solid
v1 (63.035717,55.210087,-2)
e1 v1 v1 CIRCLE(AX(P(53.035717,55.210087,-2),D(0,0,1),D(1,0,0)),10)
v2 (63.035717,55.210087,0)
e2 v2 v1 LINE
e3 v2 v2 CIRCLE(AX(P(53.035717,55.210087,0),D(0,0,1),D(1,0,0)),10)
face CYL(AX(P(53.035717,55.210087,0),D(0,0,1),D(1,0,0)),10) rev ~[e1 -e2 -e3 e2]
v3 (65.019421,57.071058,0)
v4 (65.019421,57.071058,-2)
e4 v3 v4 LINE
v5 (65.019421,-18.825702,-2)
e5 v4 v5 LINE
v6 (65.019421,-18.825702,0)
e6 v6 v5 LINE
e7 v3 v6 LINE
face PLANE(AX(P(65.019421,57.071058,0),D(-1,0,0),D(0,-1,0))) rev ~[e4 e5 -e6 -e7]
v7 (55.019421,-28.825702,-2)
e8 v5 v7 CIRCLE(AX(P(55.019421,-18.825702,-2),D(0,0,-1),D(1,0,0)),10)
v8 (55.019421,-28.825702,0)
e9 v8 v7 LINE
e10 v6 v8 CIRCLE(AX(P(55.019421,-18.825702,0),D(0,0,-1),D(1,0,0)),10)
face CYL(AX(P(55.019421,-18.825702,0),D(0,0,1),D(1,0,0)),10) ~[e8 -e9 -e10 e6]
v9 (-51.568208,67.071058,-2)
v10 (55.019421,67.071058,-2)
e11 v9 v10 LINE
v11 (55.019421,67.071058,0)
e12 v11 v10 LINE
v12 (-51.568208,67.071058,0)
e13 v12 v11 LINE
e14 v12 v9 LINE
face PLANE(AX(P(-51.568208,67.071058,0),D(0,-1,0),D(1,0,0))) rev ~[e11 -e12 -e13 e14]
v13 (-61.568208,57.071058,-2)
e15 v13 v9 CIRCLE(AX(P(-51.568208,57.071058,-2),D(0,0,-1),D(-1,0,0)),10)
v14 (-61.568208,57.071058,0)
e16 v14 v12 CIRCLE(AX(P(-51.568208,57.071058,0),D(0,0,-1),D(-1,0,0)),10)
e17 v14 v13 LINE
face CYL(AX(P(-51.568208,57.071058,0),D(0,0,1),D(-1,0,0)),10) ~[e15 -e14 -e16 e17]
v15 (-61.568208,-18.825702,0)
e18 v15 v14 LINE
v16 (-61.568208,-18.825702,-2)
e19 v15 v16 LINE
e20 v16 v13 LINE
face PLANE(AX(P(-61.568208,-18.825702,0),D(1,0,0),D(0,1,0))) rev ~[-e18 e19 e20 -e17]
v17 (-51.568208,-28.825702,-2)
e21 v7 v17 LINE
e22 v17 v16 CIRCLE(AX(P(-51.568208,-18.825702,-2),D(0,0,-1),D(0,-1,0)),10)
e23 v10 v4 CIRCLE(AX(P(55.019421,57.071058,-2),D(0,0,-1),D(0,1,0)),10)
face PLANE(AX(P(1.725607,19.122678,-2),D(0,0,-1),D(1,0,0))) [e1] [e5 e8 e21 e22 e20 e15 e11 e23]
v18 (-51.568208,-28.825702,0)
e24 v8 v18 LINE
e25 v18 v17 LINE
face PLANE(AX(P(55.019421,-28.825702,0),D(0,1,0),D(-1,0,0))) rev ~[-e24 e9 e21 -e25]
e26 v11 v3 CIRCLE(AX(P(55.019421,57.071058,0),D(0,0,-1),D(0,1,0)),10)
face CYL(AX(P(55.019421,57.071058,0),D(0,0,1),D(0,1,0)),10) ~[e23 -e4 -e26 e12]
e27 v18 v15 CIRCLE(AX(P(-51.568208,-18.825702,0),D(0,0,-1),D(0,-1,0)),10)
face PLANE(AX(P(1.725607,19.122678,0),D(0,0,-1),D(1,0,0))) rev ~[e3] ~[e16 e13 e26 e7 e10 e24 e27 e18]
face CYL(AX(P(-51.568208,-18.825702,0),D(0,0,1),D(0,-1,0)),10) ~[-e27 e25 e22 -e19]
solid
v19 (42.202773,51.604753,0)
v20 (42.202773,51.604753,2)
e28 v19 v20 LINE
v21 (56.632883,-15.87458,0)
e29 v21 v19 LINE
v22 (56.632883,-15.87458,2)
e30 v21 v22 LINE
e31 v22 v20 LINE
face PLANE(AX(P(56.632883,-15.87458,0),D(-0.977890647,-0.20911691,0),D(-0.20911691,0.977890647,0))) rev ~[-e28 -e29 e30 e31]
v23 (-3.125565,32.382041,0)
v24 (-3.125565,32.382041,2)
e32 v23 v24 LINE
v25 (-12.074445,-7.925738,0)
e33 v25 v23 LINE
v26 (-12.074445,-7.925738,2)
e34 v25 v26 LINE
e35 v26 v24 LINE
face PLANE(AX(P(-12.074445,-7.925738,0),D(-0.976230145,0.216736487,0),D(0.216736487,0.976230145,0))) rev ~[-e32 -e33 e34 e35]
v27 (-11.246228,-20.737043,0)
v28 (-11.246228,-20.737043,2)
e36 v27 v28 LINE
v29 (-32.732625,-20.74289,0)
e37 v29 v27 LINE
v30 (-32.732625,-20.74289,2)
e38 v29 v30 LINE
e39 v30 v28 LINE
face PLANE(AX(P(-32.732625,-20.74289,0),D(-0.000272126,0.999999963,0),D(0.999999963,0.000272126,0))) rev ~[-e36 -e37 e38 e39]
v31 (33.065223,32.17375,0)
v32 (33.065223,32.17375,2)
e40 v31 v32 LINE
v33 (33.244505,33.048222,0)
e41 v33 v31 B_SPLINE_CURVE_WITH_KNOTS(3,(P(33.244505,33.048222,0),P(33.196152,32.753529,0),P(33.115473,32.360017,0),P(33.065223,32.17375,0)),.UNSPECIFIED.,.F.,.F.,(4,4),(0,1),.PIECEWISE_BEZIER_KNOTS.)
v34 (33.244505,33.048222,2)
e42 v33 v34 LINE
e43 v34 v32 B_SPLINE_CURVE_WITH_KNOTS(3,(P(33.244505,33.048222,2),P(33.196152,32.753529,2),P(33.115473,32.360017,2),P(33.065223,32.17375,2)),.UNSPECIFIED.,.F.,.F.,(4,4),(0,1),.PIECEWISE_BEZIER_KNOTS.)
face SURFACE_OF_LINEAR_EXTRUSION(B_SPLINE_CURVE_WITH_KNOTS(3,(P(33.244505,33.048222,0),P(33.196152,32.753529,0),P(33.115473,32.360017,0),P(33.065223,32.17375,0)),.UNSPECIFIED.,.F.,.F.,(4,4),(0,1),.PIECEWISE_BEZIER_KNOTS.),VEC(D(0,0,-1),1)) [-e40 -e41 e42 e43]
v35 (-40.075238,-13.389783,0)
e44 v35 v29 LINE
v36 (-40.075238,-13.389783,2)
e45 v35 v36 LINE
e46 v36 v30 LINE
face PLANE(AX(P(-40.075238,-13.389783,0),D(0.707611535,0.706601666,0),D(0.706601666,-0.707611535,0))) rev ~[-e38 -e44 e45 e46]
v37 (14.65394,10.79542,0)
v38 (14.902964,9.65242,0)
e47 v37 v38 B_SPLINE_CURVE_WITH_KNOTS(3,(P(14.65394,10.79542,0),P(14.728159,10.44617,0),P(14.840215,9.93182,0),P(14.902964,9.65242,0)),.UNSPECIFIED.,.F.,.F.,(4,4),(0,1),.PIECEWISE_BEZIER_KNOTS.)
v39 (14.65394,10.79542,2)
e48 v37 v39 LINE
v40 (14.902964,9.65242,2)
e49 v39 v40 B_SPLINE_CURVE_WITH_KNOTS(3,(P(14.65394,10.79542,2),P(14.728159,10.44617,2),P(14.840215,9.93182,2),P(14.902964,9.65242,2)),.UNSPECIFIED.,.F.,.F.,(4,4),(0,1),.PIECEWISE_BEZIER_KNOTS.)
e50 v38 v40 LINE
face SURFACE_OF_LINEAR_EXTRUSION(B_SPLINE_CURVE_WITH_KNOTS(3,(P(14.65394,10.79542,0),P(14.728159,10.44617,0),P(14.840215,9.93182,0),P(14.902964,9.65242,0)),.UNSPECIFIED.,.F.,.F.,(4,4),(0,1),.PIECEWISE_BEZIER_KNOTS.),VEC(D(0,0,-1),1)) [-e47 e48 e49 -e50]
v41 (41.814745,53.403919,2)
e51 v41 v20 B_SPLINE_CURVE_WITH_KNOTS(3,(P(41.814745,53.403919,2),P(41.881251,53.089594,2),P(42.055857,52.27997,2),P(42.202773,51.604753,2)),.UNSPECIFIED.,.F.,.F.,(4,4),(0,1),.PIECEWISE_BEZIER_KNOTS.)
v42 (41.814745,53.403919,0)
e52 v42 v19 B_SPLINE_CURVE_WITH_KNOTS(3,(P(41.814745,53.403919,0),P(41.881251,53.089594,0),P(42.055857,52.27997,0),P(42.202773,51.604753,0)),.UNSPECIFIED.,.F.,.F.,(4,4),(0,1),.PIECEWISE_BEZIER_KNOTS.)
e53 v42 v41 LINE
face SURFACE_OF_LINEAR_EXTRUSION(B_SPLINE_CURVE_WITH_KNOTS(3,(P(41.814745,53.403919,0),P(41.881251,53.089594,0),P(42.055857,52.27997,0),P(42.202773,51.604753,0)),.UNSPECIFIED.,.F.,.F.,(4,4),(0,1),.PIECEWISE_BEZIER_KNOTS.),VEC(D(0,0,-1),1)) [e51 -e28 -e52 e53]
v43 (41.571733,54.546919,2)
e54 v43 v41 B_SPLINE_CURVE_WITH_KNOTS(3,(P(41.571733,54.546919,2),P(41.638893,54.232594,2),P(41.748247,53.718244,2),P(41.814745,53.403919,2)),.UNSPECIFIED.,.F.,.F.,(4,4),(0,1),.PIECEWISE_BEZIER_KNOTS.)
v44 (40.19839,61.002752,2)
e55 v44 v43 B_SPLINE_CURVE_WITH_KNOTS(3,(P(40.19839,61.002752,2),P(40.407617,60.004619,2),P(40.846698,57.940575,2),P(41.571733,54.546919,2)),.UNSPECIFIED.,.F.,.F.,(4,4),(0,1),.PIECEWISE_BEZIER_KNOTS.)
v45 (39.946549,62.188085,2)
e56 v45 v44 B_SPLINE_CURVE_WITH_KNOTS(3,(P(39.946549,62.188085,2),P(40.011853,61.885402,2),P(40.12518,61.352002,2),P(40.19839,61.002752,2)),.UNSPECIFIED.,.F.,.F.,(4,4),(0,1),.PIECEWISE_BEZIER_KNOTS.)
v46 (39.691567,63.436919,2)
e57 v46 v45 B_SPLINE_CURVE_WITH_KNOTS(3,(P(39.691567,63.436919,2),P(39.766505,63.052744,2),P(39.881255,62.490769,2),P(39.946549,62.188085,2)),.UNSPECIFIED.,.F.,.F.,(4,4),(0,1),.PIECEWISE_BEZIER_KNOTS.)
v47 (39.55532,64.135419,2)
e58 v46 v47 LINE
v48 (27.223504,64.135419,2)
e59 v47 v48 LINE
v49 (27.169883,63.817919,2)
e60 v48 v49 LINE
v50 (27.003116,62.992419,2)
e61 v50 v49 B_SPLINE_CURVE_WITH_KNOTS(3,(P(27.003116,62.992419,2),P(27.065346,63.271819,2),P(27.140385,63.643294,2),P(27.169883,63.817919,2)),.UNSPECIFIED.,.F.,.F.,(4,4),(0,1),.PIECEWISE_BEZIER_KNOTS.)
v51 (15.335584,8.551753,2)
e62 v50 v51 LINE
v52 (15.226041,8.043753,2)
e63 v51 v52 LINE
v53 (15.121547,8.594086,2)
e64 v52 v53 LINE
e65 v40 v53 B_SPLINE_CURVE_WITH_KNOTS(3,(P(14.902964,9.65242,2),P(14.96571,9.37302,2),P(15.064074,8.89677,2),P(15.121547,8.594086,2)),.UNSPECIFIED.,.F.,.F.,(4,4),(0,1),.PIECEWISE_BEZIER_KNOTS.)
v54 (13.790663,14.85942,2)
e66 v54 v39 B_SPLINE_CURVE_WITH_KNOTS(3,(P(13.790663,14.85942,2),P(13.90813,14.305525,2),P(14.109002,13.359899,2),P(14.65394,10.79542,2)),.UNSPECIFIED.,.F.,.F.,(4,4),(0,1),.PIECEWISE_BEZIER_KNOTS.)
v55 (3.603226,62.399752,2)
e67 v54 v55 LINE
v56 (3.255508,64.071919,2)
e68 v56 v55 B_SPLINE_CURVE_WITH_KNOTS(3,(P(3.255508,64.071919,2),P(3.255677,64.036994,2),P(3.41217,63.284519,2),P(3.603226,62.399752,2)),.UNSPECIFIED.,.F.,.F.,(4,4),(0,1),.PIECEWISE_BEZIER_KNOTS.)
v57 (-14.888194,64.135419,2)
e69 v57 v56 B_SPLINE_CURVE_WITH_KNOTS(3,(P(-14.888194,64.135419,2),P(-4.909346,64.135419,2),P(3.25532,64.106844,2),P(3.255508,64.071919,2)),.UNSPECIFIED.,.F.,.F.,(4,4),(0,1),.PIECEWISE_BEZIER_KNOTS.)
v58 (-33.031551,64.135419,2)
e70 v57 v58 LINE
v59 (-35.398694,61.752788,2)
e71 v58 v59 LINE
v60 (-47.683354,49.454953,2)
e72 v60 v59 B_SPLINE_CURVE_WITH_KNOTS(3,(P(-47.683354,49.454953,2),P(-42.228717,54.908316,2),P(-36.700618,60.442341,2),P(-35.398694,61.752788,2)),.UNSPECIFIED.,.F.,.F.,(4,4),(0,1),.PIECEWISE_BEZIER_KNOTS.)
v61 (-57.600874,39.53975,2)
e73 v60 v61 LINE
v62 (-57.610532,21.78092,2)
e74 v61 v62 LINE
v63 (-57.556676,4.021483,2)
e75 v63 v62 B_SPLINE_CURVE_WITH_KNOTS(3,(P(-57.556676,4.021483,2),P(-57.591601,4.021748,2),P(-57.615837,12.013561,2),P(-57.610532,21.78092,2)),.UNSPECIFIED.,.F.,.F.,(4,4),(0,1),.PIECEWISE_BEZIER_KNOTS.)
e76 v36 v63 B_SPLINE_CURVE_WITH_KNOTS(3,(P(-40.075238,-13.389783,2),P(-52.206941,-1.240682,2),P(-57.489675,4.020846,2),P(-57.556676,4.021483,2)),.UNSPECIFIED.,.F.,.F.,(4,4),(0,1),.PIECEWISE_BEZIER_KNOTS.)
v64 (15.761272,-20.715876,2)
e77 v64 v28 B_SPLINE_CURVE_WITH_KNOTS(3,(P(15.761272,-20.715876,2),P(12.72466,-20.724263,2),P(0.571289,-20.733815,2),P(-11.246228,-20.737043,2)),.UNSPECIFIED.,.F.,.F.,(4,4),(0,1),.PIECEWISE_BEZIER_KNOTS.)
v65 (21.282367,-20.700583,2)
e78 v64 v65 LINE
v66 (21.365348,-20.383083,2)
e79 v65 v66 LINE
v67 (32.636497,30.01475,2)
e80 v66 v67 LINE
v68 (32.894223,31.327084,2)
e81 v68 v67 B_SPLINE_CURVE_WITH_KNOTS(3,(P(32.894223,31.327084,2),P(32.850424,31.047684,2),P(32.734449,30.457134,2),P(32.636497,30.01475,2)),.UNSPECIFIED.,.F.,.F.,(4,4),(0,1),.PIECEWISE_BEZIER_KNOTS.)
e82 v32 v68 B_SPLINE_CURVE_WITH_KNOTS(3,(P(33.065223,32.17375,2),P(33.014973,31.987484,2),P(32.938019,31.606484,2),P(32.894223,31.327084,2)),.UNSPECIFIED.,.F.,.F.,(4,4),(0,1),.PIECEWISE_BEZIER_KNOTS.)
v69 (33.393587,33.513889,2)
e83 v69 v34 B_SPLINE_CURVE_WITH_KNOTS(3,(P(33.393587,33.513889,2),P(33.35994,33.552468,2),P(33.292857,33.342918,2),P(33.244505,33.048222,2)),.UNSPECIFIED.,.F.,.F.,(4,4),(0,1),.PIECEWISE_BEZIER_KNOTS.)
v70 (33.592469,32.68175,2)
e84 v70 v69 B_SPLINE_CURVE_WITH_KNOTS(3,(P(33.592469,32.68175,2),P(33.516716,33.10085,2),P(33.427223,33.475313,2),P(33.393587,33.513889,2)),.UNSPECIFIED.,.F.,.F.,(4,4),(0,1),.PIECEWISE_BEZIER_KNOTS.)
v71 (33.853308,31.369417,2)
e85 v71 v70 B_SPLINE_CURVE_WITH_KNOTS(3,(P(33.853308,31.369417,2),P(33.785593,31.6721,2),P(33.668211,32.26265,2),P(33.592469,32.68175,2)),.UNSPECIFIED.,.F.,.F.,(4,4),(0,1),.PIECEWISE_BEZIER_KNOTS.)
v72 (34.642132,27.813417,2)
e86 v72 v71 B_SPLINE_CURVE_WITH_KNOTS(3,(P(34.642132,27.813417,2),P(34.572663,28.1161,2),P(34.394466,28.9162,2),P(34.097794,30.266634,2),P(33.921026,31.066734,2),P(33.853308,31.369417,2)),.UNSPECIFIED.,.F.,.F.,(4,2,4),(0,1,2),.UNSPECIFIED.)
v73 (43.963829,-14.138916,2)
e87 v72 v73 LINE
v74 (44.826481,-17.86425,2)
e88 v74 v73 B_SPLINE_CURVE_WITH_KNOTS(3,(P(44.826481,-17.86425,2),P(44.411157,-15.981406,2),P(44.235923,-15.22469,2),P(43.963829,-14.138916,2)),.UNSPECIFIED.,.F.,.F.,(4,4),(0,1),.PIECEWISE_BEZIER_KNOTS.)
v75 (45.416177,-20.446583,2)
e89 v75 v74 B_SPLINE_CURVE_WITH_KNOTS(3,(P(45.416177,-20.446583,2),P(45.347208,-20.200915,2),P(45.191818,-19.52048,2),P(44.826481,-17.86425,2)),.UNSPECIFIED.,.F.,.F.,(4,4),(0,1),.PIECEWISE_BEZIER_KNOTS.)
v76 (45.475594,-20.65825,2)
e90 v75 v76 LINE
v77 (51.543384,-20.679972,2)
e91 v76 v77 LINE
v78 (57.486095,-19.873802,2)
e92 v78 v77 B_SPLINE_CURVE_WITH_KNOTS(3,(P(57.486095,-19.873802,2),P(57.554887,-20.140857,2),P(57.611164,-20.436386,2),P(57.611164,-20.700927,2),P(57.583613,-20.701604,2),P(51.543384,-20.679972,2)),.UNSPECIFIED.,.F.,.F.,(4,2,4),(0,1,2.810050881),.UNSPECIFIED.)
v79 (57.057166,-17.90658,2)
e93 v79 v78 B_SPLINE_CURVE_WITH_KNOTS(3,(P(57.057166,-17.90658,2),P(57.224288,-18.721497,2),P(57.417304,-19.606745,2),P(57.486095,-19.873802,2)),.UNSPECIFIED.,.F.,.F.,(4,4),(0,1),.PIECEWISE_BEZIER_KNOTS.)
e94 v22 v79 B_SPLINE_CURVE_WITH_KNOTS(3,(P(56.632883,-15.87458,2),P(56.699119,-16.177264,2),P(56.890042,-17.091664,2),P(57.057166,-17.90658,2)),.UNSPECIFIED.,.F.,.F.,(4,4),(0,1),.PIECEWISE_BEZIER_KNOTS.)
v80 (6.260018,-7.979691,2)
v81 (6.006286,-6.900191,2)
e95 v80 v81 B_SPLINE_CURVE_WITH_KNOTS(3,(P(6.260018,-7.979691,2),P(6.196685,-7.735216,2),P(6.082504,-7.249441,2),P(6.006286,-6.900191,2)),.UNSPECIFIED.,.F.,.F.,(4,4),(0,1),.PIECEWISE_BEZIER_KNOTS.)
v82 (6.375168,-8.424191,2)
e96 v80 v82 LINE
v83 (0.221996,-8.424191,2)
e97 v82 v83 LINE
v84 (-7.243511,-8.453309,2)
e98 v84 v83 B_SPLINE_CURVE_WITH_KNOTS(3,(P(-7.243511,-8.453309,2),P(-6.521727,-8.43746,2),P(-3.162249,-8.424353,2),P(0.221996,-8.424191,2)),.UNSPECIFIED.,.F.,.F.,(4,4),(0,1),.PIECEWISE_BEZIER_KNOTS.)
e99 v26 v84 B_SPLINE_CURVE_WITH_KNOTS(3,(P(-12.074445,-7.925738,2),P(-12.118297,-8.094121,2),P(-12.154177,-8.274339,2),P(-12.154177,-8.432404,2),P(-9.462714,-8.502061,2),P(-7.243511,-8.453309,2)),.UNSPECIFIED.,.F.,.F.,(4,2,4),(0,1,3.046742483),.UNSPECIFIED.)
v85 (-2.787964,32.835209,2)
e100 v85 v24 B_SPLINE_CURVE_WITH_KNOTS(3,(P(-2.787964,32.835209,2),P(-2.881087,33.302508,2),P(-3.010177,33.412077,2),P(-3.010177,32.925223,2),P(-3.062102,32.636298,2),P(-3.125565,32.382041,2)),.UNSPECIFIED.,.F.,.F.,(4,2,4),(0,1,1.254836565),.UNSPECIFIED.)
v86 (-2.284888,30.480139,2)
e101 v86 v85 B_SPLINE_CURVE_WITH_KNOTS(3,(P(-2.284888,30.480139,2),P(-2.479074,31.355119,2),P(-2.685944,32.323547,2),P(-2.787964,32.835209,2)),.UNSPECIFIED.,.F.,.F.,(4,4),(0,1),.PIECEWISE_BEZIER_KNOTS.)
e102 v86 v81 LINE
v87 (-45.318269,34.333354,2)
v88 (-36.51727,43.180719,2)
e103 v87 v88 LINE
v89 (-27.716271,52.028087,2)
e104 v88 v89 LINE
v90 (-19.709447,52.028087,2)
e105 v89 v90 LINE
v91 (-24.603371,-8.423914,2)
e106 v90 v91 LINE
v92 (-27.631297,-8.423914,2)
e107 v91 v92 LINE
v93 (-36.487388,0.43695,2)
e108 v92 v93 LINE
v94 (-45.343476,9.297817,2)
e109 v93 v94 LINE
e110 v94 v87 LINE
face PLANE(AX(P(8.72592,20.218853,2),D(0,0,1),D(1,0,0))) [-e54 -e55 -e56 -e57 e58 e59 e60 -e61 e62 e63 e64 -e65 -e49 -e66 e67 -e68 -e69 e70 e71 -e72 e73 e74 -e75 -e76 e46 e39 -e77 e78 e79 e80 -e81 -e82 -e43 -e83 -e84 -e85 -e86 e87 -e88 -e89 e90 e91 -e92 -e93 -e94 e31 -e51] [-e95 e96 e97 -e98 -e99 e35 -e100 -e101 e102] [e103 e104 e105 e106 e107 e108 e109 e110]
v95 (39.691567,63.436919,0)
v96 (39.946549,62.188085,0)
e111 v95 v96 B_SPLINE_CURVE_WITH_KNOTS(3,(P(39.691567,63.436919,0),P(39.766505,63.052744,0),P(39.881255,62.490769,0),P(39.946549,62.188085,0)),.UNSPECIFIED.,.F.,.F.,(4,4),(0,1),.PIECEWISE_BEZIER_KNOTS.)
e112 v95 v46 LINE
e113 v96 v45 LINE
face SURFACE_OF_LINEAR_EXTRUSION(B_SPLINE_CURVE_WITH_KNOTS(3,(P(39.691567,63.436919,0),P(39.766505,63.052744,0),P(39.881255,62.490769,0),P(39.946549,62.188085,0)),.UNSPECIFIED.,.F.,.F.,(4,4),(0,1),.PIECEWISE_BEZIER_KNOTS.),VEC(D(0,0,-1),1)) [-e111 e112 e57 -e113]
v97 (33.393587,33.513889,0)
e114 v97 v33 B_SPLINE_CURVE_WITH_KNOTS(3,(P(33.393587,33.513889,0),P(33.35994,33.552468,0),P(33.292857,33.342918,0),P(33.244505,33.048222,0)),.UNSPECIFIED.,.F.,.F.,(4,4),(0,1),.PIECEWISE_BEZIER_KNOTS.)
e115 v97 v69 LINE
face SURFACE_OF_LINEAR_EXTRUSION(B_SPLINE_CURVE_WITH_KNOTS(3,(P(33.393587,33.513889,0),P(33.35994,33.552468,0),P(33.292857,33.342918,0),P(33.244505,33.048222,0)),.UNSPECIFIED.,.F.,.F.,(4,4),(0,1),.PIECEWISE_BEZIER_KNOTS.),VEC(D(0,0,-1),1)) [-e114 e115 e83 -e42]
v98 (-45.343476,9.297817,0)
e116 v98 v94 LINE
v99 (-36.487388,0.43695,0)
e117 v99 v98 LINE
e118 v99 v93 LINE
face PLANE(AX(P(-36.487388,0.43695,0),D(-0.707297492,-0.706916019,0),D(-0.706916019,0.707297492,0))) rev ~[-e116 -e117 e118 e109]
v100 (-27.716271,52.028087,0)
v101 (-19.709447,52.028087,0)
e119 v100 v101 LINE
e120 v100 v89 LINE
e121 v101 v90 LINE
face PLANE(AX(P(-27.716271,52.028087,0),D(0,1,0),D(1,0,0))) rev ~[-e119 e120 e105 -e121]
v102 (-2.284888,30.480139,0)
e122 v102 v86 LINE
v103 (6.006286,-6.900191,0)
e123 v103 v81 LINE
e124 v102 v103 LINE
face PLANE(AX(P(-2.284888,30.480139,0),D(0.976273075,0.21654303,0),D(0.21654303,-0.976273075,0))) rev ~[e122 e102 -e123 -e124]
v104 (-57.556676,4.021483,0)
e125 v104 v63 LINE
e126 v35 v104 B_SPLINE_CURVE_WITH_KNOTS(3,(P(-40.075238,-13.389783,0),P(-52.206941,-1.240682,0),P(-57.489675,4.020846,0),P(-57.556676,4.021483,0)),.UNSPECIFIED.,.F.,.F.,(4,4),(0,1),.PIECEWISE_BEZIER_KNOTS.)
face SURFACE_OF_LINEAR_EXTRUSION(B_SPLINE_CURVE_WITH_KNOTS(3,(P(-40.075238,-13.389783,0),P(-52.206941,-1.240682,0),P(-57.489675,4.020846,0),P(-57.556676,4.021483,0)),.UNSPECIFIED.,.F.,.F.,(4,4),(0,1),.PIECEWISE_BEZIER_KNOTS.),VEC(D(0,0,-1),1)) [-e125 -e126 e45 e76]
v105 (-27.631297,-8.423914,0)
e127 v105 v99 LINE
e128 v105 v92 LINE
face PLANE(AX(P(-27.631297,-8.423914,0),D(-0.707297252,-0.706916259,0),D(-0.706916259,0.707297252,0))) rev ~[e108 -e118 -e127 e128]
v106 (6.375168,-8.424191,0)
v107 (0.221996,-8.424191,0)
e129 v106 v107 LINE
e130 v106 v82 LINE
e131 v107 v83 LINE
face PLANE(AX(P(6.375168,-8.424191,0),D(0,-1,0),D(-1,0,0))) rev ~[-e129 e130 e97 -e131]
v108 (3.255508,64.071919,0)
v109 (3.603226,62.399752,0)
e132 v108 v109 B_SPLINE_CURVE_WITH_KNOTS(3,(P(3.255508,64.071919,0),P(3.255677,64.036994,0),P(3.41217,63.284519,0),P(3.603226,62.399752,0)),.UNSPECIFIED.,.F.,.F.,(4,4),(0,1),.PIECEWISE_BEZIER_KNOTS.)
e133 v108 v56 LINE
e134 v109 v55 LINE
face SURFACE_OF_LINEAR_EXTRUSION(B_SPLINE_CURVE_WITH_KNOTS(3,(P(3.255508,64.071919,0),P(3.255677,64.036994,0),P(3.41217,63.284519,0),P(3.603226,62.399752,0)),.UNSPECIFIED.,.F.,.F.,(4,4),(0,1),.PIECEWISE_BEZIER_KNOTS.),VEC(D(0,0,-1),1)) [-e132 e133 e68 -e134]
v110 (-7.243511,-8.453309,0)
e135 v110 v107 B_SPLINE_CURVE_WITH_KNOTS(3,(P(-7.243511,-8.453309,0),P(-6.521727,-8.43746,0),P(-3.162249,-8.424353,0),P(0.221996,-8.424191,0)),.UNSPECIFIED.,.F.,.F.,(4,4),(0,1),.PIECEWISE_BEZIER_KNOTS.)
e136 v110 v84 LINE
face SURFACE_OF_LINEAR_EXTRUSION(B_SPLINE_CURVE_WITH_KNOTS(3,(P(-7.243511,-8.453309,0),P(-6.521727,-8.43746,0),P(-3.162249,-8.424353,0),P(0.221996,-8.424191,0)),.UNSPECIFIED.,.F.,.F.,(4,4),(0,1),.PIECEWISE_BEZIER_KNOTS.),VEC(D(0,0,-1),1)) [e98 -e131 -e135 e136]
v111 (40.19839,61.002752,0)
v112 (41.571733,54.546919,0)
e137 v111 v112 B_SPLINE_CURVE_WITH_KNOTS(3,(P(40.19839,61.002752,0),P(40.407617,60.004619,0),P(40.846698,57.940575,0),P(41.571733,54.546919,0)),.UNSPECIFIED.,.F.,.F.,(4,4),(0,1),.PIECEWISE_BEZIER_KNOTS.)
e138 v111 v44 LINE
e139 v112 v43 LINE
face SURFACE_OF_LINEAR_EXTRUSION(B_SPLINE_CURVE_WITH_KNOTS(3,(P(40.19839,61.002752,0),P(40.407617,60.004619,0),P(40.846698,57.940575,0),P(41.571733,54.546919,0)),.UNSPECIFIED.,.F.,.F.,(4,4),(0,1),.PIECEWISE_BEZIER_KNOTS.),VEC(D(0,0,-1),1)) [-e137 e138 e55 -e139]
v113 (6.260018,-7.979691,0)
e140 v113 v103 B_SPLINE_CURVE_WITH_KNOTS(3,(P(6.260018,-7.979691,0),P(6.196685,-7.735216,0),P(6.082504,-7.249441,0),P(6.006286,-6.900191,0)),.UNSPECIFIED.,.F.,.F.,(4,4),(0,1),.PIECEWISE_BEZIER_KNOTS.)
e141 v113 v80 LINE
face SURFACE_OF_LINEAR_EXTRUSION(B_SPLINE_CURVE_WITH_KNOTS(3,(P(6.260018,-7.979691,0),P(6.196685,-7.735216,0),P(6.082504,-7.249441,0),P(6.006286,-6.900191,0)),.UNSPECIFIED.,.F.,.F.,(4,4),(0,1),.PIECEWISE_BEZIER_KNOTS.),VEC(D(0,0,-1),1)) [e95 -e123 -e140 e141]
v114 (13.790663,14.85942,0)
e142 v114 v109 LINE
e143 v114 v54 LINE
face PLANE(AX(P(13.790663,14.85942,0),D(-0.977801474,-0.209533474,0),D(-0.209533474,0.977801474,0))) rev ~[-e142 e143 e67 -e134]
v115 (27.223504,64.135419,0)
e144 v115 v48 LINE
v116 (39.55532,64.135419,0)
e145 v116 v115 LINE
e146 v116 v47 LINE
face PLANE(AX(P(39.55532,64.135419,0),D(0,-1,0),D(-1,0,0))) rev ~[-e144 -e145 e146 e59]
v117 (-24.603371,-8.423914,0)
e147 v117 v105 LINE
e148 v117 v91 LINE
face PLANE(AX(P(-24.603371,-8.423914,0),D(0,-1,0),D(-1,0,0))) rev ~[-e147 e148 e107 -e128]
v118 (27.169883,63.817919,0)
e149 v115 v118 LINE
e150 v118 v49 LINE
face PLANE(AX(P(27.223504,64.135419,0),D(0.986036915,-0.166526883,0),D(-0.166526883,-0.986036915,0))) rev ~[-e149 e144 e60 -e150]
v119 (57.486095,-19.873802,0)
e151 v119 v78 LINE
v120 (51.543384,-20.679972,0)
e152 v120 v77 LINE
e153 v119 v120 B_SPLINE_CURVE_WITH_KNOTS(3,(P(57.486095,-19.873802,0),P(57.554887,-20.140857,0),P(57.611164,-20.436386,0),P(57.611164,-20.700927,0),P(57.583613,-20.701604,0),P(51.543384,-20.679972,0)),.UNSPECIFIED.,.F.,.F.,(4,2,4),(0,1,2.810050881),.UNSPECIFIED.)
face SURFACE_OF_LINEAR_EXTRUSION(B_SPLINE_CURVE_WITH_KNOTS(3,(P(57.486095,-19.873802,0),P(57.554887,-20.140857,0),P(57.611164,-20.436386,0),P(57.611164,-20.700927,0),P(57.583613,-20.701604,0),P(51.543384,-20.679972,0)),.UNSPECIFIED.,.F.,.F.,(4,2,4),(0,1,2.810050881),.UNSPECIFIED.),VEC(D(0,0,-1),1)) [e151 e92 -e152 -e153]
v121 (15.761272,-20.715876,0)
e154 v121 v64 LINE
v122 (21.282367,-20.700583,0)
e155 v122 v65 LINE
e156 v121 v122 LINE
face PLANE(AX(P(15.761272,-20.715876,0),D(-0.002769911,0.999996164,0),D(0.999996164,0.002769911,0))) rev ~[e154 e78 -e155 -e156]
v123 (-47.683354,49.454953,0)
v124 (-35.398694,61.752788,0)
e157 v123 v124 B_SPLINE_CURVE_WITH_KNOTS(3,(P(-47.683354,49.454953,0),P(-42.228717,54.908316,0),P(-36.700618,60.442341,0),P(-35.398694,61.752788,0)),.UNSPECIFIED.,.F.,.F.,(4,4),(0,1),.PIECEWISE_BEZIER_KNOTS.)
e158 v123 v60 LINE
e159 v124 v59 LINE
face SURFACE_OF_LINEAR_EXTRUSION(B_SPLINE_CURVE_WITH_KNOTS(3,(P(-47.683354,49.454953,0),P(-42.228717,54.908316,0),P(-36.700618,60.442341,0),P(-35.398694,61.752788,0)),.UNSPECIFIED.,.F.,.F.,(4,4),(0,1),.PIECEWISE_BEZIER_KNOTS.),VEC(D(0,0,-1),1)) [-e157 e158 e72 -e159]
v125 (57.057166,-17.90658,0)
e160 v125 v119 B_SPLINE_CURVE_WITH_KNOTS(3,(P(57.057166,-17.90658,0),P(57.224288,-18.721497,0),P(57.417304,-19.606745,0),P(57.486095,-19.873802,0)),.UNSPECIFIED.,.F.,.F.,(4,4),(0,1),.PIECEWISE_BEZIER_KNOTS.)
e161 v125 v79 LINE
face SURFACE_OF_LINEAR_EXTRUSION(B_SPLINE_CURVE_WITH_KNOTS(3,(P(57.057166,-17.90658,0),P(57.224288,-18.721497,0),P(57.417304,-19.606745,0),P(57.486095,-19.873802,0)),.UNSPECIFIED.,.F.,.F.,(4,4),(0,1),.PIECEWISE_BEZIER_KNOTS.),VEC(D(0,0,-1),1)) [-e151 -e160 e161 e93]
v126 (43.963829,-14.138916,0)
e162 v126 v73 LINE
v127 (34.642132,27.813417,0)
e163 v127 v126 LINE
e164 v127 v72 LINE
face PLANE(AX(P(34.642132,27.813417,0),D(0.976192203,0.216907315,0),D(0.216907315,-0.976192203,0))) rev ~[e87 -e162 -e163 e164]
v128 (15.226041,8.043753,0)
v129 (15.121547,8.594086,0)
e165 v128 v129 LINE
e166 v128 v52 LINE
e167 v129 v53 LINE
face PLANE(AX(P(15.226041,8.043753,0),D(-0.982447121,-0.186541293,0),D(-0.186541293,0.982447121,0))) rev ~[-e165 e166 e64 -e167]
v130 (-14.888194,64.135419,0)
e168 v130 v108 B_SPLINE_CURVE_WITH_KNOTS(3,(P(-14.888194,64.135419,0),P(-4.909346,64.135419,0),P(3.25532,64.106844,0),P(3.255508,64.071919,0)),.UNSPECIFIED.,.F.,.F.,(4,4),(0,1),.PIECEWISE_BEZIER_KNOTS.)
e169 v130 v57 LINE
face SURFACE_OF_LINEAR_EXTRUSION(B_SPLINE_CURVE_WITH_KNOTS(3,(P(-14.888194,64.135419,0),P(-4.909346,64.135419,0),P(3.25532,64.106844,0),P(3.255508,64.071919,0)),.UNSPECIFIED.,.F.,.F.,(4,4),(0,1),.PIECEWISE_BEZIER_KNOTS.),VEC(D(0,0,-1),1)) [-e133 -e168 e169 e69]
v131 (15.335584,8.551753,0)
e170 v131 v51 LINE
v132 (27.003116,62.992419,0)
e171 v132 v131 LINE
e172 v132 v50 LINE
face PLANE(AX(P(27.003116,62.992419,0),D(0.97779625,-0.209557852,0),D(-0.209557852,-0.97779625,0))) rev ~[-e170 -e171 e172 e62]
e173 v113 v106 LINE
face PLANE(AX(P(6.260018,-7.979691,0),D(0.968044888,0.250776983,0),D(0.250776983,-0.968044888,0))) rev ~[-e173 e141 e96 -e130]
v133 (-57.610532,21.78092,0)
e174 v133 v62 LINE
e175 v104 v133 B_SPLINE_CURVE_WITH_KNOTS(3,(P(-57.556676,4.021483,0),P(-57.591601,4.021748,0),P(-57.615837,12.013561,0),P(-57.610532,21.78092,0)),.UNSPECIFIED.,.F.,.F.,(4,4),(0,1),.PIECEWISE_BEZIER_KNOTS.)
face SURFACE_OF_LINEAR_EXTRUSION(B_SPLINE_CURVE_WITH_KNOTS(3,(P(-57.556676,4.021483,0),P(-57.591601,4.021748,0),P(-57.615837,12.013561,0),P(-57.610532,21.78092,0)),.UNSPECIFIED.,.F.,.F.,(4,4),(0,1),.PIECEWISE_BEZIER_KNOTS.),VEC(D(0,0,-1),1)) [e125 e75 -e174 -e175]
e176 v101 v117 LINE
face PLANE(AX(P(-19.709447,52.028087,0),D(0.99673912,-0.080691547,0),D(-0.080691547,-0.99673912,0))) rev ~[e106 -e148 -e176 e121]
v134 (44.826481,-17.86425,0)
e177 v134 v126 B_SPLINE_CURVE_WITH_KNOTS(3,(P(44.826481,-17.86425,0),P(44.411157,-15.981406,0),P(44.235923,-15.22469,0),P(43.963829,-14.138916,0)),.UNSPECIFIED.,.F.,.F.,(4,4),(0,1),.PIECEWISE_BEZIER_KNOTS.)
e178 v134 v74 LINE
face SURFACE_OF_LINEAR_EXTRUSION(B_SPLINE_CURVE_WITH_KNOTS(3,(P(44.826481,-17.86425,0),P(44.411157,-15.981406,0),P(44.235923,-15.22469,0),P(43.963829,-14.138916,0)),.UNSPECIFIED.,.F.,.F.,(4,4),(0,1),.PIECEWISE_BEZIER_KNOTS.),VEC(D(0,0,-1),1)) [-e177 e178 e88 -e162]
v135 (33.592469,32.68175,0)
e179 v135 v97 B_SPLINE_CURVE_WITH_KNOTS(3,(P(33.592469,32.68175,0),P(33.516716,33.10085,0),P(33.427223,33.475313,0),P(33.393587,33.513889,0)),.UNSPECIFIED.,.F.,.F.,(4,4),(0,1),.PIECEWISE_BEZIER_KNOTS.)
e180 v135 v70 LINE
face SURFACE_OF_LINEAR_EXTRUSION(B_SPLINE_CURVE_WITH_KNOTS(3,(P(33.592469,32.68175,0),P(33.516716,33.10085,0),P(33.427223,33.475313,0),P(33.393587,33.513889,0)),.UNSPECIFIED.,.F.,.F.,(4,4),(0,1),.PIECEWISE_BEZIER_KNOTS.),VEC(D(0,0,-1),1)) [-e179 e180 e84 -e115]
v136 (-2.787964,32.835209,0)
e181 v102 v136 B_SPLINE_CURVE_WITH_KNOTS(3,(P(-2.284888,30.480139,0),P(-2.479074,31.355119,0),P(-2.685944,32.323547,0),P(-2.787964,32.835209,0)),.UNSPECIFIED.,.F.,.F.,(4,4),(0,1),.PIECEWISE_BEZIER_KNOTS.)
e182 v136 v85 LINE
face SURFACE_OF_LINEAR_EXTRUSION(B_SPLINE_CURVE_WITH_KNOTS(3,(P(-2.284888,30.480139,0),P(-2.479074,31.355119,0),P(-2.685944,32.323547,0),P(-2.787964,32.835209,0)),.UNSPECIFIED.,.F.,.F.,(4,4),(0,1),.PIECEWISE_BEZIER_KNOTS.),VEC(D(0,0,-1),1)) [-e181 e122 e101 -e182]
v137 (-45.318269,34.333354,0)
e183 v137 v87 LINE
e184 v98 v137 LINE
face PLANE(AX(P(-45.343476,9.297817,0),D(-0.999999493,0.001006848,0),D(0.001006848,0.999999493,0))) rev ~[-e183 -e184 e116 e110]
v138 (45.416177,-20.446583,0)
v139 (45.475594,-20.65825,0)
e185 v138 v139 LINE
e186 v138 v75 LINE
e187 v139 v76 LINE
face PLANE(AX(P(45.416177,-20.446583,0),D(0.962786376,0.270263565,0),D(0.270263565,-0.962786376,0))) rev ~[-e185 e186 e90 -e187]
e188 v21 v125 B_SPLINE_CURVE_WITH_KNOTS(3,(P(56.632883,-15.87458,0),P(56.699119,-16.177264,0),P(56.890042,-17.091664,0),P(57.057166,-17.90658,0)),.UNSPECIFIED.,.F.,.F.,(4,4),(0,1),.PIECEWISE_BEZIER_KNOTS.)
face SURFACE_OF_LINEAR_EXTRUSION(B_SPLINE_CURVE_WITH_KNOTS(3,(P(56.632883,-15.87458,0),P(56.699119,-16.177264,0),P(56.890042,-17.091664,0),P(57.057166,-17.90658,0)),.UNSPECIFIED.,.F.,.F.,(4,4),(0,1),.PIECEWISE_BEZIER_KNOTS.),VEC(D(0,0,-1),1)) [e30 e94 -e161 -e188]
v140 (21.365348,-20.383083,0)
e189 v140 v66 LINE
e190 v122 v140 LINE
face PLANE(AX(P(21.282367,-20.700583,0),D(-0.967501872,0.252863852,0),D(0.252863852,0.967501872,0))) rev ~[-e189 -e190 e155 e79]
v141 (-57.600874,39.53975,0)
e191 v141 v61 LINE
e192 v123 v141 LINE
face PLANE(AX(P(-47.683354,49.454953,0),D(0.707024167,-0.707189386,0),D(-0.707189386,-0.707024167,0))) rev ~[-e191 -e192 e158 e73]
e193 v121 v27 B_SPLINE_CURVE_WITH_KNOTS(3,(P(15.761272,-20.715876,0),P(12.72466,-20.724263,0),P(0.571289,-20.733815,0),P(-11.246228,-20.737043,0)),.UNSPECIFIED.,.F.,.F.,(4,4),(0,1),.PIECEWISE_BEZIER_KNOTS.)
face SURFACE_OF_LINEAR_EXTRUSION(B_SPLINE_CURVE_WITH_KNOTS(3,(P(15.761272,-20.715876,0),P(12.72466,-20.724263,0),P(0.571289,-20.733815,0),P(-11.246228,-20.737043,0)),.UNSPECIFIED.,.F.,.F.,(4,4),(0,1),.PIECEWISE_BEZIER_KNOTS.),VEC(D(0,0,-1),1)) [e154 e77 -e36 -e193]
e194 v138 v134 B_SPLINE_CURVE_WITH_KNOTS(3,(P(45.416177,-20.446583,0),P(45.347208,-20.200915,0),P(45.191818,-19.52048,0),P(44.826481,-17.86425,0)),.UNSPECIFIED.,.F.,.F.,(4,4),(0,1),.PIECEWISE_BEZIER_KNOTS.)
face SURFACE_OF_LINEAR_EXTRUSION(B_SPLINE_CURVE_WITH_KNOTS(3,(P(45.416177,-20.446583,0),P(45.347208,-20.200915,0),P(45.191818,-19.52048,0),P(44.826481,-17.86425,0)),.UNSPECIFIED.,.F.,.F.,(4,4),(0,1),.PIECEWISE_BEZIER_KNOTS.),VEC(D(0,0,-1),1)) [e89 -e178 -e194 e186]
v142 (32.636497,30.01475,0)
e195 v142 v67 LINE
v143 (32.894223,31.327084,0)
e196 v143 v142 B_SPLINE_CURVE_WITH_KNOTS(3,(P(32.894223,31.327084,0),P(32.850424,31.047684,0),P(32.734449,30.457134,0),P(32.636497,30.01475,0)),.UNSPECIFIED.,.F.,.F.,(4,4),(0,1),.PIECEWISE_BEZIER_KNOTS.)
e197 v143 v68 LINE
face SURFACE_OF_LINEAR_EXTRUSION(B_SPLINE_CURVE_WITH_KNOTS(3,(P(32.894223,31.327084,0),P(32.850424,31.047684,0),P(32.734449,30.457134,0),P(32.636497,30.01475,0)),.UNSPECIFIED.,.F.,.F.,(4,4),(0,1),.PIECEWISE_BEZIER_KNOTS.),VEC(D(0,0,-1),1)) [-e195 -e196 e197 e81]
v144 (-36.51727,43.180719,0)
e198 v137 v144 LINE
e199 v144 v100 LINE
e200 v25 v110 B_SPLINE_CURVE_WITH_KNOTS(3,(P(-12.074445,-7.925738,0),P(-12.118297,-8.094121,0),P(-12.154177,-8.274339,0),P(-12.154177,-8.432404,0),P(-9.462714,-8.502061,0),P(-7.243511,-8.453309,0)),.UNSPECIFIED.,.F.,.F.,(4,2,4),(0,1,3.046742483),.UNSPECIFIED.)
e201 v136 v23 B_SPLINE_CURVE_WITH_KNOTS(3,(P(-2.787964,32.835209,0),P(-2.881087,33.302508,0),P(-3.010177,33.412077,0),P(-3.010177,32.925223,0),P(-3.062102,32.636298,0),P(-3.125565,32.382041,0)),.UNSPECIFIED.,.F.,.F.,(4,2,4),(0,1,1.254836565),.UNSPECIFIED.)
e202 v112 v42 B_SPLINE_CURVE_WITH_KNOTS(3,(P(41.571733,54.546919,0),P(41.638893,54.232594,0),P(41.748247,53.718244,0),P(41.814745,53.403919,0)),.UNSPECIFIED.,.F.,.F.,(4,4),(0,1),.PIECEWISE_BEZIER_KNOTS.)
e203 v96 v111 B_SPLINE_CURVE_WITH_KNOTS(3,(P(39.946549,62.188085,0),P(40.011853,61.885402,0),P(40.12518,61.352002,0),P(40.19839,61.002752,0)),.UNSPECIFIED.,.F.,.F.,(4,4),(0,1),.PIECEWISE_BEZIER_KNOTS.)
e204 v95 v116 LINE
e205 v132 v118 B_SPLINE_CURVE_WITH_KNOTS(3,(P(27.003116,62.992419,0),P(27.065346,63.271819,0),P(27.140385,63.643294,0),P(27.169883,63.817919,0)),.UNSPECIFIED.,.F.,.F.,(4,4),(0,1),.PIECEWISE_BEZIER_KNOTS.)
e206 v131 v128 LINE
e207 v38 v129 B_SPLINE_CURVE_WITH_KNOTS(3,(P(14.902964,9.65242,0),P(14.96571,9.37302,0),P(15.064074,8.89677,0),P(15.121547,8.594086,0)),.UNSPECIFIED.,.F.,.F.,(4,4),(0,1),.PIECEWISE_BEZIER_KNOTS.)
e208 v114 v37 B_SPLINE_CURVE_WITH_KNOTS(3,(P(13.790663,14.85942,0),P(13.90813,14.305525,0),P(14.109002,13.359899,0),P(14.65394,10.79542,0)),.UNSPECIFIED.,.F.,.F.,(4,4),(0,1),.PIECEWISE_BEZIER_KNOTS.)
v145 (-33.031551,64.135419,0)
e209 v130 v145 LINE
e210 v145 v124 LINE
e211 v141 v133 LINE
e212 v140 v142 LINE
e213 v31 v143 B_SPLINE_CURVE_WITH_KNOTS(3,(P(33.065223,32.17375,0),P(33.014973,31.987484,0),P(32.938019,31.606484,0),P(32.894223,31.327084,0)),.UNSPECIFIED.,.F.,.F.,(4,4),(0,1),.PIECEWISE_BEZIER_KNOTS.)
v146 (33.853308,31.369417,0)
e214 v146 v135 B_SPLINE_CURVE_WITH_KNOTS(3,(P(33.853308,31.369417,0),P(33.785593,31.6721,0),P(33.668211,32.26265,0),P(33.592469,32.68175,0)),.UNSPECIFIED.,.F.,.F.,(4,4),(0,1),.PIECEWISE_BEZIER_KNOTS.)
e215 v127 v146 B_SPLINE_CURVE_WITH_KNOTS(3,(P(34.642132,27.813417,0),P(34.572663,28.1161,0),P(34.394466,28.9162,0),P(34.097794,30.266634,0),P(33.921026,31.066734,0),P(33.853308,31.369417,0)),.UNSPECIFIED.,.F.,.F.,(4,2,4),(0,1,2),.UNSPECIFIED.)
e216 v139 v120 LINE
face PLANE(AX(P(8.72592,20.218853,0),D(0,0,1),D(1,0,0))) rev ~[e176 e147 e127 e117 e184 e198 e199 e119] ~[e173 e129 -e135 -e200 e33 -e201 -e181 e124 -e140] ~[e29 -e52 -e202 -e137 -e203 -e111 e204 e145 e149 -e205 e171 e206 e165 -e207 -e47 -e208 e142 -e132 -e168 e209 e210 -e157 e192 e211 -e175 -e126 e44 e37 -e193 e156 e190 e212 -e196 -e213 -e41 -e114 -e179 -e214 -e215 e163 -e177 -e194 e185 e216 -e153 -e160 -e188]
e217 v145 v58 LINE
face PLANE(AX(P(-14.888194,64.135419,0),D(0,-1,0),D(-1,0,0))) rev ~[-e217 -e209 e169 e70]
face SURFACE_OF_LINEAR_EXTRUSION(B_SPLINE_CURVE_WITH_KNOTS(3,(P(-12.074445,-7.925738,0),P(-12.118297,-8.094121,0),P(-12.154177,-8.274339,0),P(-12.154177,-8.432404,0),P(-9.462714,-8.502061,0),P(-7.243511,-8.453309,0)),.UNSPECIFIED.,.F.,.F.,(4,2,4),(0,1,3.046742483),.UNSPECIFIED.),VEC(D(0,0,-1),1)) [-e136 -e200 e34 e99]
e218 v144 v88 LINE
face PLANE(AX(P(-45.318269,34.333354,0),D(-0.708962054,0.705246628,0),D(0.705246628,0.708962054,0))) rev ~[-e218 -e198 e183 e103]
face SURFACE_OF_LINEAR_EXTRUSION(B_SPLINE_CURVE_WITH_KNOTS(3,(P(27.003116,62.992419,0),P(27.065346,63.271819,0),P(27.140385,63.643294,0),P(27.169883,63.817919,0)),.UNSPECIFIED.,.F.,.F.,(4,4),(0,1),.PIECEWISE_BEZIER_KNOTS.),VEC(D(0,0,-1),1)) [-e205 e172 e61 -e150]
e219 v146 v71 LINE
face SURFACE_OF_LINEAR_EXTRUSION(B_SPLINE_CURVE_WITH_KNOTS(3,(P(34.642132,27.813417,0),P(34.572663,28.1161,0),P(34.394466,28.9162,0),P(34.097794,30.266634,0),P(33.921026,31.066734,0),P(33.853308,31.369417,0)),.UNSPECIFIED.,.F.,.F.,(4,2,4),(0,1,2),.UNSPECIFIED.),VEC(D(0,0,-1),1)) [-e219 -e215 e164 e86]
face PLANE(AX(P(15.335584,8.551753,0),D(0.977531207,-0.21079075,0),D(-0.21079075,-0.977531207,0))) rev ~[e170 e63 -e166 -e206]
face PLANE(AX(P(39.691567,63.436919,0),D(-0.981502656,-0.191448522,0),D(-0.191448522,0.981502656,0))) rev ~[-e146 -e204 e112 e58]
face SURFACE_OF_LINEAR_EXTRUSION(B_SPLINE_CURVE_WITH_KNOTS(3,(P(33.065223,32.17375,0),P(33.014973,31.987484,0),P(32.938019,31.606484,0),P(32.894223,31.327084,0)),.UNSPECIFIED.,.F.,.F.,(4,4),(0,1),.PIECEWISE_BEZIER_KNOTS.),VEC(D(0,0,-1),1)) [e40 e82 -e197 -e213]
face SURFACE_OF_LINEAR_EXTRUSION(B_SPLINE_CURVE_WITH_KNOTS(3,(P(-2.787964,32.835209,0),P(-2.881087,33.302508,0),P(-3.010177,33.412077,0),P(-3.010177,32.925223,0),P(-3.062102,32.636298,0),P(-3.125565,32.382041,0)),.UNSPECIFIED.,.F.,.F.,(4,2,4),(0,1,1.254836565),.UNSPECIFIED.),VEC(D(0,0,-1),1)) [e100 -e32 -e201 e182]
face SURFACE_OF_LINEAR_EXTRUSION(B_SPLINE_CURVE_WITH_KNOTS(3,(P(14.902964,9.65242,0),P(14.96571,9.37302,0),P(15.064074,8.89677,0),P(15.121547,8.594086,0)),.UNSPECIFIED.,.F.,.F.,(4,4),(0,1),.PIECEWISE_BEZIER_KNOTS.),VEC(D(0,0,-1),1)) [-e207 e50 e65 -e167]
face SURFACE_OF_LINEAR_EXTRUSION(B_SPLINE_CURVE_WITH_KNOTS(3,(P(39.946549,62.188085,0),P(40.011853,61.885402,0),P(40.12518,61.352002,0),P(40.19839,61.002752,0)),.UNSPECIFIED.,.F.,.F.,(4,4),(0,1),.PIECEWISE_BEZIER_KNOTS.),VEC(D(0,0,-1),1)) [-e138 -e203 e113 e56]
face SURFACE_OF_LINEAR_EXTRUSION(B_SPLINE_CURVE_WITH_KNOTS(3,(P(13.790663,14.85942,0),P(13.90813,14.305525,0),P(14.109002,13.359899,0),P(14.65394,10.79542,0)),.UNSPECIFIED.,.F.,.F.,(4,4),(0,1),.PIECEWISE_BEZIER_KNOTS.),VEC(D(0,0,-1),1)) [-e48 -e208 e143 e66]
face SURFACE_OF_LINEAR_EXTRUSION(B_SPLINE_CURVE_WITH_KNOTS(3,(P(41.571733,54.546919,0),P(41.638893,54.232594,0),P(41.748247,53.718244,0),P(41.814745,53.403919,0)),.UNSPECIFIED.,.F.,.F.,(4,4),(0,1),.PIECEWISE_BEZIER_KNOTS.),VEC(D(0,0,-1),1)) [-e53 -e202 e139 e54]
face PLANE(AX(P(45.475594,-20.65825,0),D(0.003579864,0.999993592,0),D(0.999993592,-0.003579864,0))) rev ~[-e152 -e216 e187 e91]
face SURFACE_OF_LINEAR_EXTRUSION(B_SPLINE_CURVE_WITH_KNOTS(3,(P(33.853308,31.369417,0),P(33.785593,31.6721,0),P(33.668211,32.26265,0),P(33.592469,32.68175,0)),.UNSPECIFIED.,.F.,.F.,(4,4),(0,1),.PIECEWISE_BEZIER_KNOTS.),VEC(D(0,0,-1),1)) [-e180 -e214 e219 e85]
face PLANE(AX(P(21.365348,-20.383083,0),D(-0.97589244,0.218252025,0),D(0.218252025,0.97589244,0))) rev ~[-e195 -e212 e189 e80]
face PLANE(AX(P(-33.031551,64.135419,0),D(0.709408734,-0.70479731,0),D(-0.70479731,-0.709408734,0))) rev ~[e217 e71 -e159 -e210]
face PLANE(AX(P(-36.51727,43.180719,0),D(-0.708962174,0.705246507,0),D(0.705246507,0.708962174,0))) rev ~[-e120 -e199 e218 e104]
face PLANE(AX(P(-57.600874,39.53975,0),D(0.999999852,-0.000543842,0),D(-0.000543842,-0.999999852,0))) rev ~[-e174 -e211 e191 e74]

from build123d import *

# Parameters (mm, degrees)
F1_DEPTH = 2
F3_DEPTH = 2
F4_R     = 10
F5_DEPTH = 2


# Not quite as in the source:
# - ends of sketch curves that miss each other by under 0.0002 mm in the source are joined


with BuildPart() as f1:
    # F0 (on Top) → F1 (new body)
    with BuildSketch(Plane.XY):
        with BuildLine():
            Line((-57.600874, 39.53975), (-57.610532, 21.78092))
            add(Edge.make_bspline(
                [(-57.556676, 4.021483), (-57.591601, 4.021748), (-57.615837, 12.013561), (-57.610532, 21.78092)],
                knots=[0, 0, 0, 0, 1, 1, 1, 1], degree=3))
            add(Edge.make_bspline(
                [(-40.075238, -13.389783), (-52.206941, -1.240682), (-57.489675, 4.020846), (-57.556676, 4.021483)],
                knots=[0, 0, 0, 0, 1, 1, 1, 1], degree=3))
            Line((-40.075238, -13.389783), (-32.732625, -20.74289))
            Line((-32.732625, -20.74289), (-11.246228, -20.737043))
            add(Edge.make_bspline(
                [(15.761272, -20.715876), (12.72466, -20.724263), (0.571289, -20.733815), (-11.246228, -20.737043)],
                knots=[0, 0, 0, 0, 1, 1, 1, 1], degree=3))
            Line((15.761272, -20.715876), (21.282367, -20.700583))
            Line((21.282367, -20.700583), (21.365348, -20.383083))
            Line((21.365348, -20.383083), (32.636497, 30.01475))
            add(Edge.make_bspline(
                [(32.894223, 31.327084), (32.850424, 31.047684), (32.734449, 30.457134), (32.636497, 30.01475)],
                knots=[0, 0, 0, 0, 1, 1, 1, 1], degree=3))
            add(Edge.make_bspline(
                [(33.065223, 32.17375), (33.014973, 31.987484), (32.938019, 31.606484), (32.894223, 31.327084)],
                knots=[0, 0, 0, 0, 1, 1, 1, 1], degree=3))
            add(Edge.make_bspline(
                [(33.244505, 33.048222), (33.196152, 32.753529), (33.115473, 32.360017), (33.065223, 32.17375)],
                knots=[0, 0, 0, 0, 1, 1, 1, 1], degree=3))
            add(Edge.make_bspline(
                [(33.393587, 33.513889), (33.35994, 33.552468), (33.292857, 33.342918), (33.244505, 33.048222)],
                knots=[0, 0, 0, 0, 1, 1, 1, 1], degree=3))
            add(Edge.make_bspline(
                [(33.592469, 32.68175), (33.516716, 33.10085), (33.427223, 33.475313), (33.393587, 33.513889)],
                knots=[0, 0, 0, 0, 1, 1, 1, 1], degree=3))
            add(Edge.make_bspline(
                [(33.853308, 31.369417), (33.785593, 31.6721), (33.668211, 32.26265), (33.592469, 32.68175)],
                knots=[0, 0, 0, 0, 1, 1, 1, 1], degree=3))
            add(Edge.make_bspline(
                [(34.24613, 29.591417), (34.097794, 30.266634), (33.921026, 31.066734), (33.853308, 31.369417)],
                knots=[0, 0, 0, 0, 1, 1, 1, 1], degree=3))
            add(Edge.make_bspline(
                [(34.642132, 27.813417), (34.572663, 28.1161), (34.394466, 28.9162), (34.24613, 29.591417)],
                knots=[0, 0, 0, 0, 1, 1, 1, 1], degree=3))
            Line((34.642132, 27.813417), (43.963829, -14.138916))
            add(Edge.make_bspline(
                [(44.826481, -17.86425), (44.411157, -15.981406), (44.235923, -15.22469), (43.963829, -14.138916)],
                knots=[0, 0, 0, 0, 1, 1, 1, 1], degree=3))
            add(Edge.make_bspline(
                [(45.416177, -20.446583), (45.347208, -20.200915), (45.191818, -19.52048), (44.826481, -17.86425)],
                knots=[0, 0, 0, 0, 1, 1, 1, 1], degree=3))
            Line((45.416177, -20.446583), (45.475594, -20.65825))
            Line((45.475594, -20.65825), (51.543384, -20.679972))
            add(Edge.make_bspline(
                [(57.611164, -20.530527), (57.611164, -20.700927), (57.583613, -20.701604), (51.543384, -20.679972)],
                knots=[0, 0, 0, 0, 1, 1, 1, 1], degree=3))
            add(Edge.make_bspline(
                [(57.486095, -19.873802), (57.554887, -20.140857), (57.611164, -20.436386), (57.611164, -20.530527)],
                knots=[0, 0, 0, 0, 1, 1, 1, 1], degree=3))
            add(Edge.make_bspline(
                [(57.057166, -17.90658), (57.224288, -18.721497), (57.417304, -19.606745), (57.486095, -19.873802)],
                knots=[0, 0, 0, 0, 1, 1, 1, 1], degree=3))
            add(Edge.make_bspline(
                [(56.632883, -15.87458), (56.699119, -16.177264), (56.890042, -17.091664), (57.057166, -17.90658)],
                knots=[0, 0, 0, 0, 1, 1, 1, 1], degree=3))
            Line((56.632883, -15.87458), (42.202773, 51.604753))
            add(Edge.make_bspline(
                [(41.814745, 53.403919), (41.881251, 53.089594), (42.055857, 52.27997), (42.202773, 51.604753)],
                knots=[0, 0, 0, 0, 1, 1, 1, 1], degree=3))
            add(Edge.make_bspline(
                [(41.571733, 54.546919), (41.638893, 54.232594), (41.748247, 53.718244), (41.814745, 53.403919)],
                knots=[0, 0, 0, 0, 1, 1, 1, 1], degree=3))
            add(Edge.make_bspline(
                [(40.19839, 61.002752), (40.407617, 60.004619), (40.846698, 57.940575), (41.571733, 54.546919)],
                knots=[0, 0, 0, 0, 1, 1, 1, 1], degree=3))
            add(Edge.make_bspline(
                [(39.946549, 62.188085), (40.011853, 61.885402), (40.12518, 61.352002), (40.19839, 61.002752)],
                knots=[0, 0, 0, 0, 1, 1, 1, 1], degree=3))
            add(Edge.make_bspline(
                [(39.691567, 63.436919), (39.766505, 63.052744), (39.881255, 62.490769), (39.946549, 62.188085)],
                knots=[0, 0, 0, 0, 1, 1, 1, 1], degree=3))
            Line((39.691567, 63.436919), (39.55532, 64.135419))
            Line((39.55532, 64.135419), (33.389412, 64.135419))
            Line((33.389412, 64.135419), (27.223504, 64.135419))
            Line((27.223504, 64.135419), (27.169883, 63.817919))
            add(Edge.make_bspline(
                [(27.003116, 62.992419), (27.065346, 63.271819), (27.140385, 63.643294), (27.169883, 63.817919)],
                knots=[0, 0, 0, 0, 1, 1, 1, 1], degree=3))
            Line((27.003116, 62.992419), (15.335584, 8.551753))
            Line((15.335584, 8.551753), (15.226041, 8.043753))
            Line((15.226041, 8.043753), (15.121547, 8.594086))
            add(Edge.make_bspline(
                [(14.902964, 9.65242), (14.96571, 9.37302), (15.064074, 8.89677), (15.121547, 8.594086)],
                knots=[0, 0, 0, 0, 1, 1, 1, 1], degree=3))
            add(Edge.make_bspline(
                [(14.65394, 10.79542), (14.728159, 10.44617), (14.840215, 9.93182), (14.902964, 9.65242)],
                knots=[0, 0, 0, 0, 1, 1, 1, 1], degree=3))
            add(Edge.make_bspline(
                [(13.790663, 14.85942), (13.90813, 14.305525), (14.109002, 13.359899), (14.65394, 10.79542)],
                knots=[0, 0, 0, 0, 1, 1, 1, 1], degree=3))
            Line((13.790663, 14.85942), (3.603226, 62.399752))
            add(Edge.make_bspline(
                [(3.255508, 64.071919), (3.255677, 64.036994), (3.41217, 63.284519), (3.603226, 62.399752)],
                knots=[0, 0, 0, 0, 1, 1, 1, 1], degree=3))
            add(Edge.make_bspline(
                [(-14.888194, 64.135419), (-4.909346, 64.135419), (3.25532, 64.106844), (3.255508, 64.071919)],
                knots=[0, 0, 0, 0, 1, 1, 1, 1], degree=3))
            Line((-14.888194, 64.135419), (-33.031551, 64.135419))
            Line((-33.031551, 64.135419), (-35.398694, 61.752788))
            add(Edge.make_bspline(
                [(-47.683354, 49.454953), (-42.228717, 54.908316), (-36.700618, 60.442341), (-35.398694, 61.752788)],
                knots=[0, 0, 0, 0, 1, 1, 1, 1], degree=3))
            Line((-47.683354, 49.454953), (-57.600874, 39.53975))
        make_face()
        with BuildLine():
            Line((6.375168, -8.424191), (0.221996, -8.424191))
            add(Edge.make_bspline(
                [(-7.243511, -8.453309), (-6.521727, -8.43746), (-3.162249, -8.424353), (0.221996, -8.424191)],
                knots=[0, 0, 0, 0, 1, 1, 1, 1], degree=3))
            add(Edge.make_bspline(
                [(-12.154177, -8.326219), (-12.154177, -8.432404), (-9.462714, -8.502061), (-7.243511, -8.453309)],
                knots=[0, 0, 0, 0, 1, 1, 1, 1], degree=3))
            add(Edge.make_bspline(
                [(-12.074445, -7.925738), (-12.118297, -8.094121), (-12.154177, -8.274339), (-12.154177, -8.326219)],
                knots=[0, 0, 0, 0, 1, 1, 1, 1], degree=3))
            Line((-12.074445, -7.925738), (-3.125565, 32.382041))
            add(Edge.make_bspline(
                [(-3.010177, 33.024095), (-3.010177, 32.925223), (-3.062102, 32.636298), (-3.125565, 32.382041)],
                knots=[0, 0, 0, 0, 1, 1, 1, 1], degree=3))
            add(Edge.make_bspline(
                [(-2.787964, 32.835209), (-2.881087, 33.302508), (-3.010177, 33.412077), (-3.010177, 33.024095)],
                knots=[0, 0, 0, 0, 1, 1, 1, 1], degree=3))
            add(Edge.make_bspline(
                [(-2.284888, 30.480139), (-2.479074, 31.355119), (-2.685944, 32.323547), (-2.787964, 32.835209)],
                knots=[0, 0, 0, 0, 1, 1, 1, 1], degree=3))
            Line((-2.284888, 30.480139), (6.006286, -6.900191))
            add(Edge.make_bspline(
                [(6.260018, -7.979691), (6.196685, -7.735216), (6.082504, -7.249441), (6.006286, -6.900191)],
                knots=[0, 0, 0, 0, 1, 1, 1, 1], degree=3))
            Line((6.260018, -7.979691), (6.375168, -8.424191))
        make_face(mode=Mode.SUBTRACT)
        Polygon((-27.716271, 52.028087), (-19.709447, 52.028087), (-24.603371, -8.423914), (-26.117335, -8.423914), (-27.631297, -8.423914), (-36.487388, 0.43695), (-45.343476, 9.297817), (-45.318269, 34.333354), (-36.51727, 43.180719), align=None, mode=Mode.SUBTRACT)
    extrude(amount=F1_DEPTH)


with BuildPart() as f3:
    # F2 (on face) → F3 (new body)
    with BuildSketch(Plane(origin=(0, 0, 0), x_dir=(1, 0, 0), z_dir=(0, 0, -1))):
        with BuildLine():
            ThreePointArc((-61.5682080388, -57.0710578561), (-58.6392758507, -64.1421256679), (-51.5682080388, -67.0710578561))
            Line((-51.5682080388, -67.0710578561), (55.0194212794, -67.0710578561))
            ThreePointArc((55.0194212794, -67.0710578561), (62.0904890913, -64.1421256679), (65.0194212794, -57.0710578561))
            Line((65.0194212794, -57.0710578561), (65.0194212794, 18.8257021457))
            ThreePointArc((65.0194212794, 18.8257021457), (62.0904890913, 25.8967699576), (55.0194212794, 28.8257021457))
            Line((55.0194212794, 28.8257021457), (-51.5682080388, 28.8257021457))
            ThreePointArc((-51.5682080388, 28.8257021457), (-58.6392758507, 25.8967699576), (-61.5682080388, 18.8257021457))
            Line((-61.5682080388, 18.8257021457), (-61.5682080388, -57.0710578561))
        make_face()
    extrude(amount=F3_DEPTH)

    # F4 (on face) → F5 (cut)
    with BuildSketch(Plane.XY):
        with Locations((53.0357174575, 55.2100874484)):
            Circle(F4_R)
    extrude(amount=-F5_DEPTH, mode=Mode.SUBTRACT)


solid = Compound([f1.part, f3.part])
